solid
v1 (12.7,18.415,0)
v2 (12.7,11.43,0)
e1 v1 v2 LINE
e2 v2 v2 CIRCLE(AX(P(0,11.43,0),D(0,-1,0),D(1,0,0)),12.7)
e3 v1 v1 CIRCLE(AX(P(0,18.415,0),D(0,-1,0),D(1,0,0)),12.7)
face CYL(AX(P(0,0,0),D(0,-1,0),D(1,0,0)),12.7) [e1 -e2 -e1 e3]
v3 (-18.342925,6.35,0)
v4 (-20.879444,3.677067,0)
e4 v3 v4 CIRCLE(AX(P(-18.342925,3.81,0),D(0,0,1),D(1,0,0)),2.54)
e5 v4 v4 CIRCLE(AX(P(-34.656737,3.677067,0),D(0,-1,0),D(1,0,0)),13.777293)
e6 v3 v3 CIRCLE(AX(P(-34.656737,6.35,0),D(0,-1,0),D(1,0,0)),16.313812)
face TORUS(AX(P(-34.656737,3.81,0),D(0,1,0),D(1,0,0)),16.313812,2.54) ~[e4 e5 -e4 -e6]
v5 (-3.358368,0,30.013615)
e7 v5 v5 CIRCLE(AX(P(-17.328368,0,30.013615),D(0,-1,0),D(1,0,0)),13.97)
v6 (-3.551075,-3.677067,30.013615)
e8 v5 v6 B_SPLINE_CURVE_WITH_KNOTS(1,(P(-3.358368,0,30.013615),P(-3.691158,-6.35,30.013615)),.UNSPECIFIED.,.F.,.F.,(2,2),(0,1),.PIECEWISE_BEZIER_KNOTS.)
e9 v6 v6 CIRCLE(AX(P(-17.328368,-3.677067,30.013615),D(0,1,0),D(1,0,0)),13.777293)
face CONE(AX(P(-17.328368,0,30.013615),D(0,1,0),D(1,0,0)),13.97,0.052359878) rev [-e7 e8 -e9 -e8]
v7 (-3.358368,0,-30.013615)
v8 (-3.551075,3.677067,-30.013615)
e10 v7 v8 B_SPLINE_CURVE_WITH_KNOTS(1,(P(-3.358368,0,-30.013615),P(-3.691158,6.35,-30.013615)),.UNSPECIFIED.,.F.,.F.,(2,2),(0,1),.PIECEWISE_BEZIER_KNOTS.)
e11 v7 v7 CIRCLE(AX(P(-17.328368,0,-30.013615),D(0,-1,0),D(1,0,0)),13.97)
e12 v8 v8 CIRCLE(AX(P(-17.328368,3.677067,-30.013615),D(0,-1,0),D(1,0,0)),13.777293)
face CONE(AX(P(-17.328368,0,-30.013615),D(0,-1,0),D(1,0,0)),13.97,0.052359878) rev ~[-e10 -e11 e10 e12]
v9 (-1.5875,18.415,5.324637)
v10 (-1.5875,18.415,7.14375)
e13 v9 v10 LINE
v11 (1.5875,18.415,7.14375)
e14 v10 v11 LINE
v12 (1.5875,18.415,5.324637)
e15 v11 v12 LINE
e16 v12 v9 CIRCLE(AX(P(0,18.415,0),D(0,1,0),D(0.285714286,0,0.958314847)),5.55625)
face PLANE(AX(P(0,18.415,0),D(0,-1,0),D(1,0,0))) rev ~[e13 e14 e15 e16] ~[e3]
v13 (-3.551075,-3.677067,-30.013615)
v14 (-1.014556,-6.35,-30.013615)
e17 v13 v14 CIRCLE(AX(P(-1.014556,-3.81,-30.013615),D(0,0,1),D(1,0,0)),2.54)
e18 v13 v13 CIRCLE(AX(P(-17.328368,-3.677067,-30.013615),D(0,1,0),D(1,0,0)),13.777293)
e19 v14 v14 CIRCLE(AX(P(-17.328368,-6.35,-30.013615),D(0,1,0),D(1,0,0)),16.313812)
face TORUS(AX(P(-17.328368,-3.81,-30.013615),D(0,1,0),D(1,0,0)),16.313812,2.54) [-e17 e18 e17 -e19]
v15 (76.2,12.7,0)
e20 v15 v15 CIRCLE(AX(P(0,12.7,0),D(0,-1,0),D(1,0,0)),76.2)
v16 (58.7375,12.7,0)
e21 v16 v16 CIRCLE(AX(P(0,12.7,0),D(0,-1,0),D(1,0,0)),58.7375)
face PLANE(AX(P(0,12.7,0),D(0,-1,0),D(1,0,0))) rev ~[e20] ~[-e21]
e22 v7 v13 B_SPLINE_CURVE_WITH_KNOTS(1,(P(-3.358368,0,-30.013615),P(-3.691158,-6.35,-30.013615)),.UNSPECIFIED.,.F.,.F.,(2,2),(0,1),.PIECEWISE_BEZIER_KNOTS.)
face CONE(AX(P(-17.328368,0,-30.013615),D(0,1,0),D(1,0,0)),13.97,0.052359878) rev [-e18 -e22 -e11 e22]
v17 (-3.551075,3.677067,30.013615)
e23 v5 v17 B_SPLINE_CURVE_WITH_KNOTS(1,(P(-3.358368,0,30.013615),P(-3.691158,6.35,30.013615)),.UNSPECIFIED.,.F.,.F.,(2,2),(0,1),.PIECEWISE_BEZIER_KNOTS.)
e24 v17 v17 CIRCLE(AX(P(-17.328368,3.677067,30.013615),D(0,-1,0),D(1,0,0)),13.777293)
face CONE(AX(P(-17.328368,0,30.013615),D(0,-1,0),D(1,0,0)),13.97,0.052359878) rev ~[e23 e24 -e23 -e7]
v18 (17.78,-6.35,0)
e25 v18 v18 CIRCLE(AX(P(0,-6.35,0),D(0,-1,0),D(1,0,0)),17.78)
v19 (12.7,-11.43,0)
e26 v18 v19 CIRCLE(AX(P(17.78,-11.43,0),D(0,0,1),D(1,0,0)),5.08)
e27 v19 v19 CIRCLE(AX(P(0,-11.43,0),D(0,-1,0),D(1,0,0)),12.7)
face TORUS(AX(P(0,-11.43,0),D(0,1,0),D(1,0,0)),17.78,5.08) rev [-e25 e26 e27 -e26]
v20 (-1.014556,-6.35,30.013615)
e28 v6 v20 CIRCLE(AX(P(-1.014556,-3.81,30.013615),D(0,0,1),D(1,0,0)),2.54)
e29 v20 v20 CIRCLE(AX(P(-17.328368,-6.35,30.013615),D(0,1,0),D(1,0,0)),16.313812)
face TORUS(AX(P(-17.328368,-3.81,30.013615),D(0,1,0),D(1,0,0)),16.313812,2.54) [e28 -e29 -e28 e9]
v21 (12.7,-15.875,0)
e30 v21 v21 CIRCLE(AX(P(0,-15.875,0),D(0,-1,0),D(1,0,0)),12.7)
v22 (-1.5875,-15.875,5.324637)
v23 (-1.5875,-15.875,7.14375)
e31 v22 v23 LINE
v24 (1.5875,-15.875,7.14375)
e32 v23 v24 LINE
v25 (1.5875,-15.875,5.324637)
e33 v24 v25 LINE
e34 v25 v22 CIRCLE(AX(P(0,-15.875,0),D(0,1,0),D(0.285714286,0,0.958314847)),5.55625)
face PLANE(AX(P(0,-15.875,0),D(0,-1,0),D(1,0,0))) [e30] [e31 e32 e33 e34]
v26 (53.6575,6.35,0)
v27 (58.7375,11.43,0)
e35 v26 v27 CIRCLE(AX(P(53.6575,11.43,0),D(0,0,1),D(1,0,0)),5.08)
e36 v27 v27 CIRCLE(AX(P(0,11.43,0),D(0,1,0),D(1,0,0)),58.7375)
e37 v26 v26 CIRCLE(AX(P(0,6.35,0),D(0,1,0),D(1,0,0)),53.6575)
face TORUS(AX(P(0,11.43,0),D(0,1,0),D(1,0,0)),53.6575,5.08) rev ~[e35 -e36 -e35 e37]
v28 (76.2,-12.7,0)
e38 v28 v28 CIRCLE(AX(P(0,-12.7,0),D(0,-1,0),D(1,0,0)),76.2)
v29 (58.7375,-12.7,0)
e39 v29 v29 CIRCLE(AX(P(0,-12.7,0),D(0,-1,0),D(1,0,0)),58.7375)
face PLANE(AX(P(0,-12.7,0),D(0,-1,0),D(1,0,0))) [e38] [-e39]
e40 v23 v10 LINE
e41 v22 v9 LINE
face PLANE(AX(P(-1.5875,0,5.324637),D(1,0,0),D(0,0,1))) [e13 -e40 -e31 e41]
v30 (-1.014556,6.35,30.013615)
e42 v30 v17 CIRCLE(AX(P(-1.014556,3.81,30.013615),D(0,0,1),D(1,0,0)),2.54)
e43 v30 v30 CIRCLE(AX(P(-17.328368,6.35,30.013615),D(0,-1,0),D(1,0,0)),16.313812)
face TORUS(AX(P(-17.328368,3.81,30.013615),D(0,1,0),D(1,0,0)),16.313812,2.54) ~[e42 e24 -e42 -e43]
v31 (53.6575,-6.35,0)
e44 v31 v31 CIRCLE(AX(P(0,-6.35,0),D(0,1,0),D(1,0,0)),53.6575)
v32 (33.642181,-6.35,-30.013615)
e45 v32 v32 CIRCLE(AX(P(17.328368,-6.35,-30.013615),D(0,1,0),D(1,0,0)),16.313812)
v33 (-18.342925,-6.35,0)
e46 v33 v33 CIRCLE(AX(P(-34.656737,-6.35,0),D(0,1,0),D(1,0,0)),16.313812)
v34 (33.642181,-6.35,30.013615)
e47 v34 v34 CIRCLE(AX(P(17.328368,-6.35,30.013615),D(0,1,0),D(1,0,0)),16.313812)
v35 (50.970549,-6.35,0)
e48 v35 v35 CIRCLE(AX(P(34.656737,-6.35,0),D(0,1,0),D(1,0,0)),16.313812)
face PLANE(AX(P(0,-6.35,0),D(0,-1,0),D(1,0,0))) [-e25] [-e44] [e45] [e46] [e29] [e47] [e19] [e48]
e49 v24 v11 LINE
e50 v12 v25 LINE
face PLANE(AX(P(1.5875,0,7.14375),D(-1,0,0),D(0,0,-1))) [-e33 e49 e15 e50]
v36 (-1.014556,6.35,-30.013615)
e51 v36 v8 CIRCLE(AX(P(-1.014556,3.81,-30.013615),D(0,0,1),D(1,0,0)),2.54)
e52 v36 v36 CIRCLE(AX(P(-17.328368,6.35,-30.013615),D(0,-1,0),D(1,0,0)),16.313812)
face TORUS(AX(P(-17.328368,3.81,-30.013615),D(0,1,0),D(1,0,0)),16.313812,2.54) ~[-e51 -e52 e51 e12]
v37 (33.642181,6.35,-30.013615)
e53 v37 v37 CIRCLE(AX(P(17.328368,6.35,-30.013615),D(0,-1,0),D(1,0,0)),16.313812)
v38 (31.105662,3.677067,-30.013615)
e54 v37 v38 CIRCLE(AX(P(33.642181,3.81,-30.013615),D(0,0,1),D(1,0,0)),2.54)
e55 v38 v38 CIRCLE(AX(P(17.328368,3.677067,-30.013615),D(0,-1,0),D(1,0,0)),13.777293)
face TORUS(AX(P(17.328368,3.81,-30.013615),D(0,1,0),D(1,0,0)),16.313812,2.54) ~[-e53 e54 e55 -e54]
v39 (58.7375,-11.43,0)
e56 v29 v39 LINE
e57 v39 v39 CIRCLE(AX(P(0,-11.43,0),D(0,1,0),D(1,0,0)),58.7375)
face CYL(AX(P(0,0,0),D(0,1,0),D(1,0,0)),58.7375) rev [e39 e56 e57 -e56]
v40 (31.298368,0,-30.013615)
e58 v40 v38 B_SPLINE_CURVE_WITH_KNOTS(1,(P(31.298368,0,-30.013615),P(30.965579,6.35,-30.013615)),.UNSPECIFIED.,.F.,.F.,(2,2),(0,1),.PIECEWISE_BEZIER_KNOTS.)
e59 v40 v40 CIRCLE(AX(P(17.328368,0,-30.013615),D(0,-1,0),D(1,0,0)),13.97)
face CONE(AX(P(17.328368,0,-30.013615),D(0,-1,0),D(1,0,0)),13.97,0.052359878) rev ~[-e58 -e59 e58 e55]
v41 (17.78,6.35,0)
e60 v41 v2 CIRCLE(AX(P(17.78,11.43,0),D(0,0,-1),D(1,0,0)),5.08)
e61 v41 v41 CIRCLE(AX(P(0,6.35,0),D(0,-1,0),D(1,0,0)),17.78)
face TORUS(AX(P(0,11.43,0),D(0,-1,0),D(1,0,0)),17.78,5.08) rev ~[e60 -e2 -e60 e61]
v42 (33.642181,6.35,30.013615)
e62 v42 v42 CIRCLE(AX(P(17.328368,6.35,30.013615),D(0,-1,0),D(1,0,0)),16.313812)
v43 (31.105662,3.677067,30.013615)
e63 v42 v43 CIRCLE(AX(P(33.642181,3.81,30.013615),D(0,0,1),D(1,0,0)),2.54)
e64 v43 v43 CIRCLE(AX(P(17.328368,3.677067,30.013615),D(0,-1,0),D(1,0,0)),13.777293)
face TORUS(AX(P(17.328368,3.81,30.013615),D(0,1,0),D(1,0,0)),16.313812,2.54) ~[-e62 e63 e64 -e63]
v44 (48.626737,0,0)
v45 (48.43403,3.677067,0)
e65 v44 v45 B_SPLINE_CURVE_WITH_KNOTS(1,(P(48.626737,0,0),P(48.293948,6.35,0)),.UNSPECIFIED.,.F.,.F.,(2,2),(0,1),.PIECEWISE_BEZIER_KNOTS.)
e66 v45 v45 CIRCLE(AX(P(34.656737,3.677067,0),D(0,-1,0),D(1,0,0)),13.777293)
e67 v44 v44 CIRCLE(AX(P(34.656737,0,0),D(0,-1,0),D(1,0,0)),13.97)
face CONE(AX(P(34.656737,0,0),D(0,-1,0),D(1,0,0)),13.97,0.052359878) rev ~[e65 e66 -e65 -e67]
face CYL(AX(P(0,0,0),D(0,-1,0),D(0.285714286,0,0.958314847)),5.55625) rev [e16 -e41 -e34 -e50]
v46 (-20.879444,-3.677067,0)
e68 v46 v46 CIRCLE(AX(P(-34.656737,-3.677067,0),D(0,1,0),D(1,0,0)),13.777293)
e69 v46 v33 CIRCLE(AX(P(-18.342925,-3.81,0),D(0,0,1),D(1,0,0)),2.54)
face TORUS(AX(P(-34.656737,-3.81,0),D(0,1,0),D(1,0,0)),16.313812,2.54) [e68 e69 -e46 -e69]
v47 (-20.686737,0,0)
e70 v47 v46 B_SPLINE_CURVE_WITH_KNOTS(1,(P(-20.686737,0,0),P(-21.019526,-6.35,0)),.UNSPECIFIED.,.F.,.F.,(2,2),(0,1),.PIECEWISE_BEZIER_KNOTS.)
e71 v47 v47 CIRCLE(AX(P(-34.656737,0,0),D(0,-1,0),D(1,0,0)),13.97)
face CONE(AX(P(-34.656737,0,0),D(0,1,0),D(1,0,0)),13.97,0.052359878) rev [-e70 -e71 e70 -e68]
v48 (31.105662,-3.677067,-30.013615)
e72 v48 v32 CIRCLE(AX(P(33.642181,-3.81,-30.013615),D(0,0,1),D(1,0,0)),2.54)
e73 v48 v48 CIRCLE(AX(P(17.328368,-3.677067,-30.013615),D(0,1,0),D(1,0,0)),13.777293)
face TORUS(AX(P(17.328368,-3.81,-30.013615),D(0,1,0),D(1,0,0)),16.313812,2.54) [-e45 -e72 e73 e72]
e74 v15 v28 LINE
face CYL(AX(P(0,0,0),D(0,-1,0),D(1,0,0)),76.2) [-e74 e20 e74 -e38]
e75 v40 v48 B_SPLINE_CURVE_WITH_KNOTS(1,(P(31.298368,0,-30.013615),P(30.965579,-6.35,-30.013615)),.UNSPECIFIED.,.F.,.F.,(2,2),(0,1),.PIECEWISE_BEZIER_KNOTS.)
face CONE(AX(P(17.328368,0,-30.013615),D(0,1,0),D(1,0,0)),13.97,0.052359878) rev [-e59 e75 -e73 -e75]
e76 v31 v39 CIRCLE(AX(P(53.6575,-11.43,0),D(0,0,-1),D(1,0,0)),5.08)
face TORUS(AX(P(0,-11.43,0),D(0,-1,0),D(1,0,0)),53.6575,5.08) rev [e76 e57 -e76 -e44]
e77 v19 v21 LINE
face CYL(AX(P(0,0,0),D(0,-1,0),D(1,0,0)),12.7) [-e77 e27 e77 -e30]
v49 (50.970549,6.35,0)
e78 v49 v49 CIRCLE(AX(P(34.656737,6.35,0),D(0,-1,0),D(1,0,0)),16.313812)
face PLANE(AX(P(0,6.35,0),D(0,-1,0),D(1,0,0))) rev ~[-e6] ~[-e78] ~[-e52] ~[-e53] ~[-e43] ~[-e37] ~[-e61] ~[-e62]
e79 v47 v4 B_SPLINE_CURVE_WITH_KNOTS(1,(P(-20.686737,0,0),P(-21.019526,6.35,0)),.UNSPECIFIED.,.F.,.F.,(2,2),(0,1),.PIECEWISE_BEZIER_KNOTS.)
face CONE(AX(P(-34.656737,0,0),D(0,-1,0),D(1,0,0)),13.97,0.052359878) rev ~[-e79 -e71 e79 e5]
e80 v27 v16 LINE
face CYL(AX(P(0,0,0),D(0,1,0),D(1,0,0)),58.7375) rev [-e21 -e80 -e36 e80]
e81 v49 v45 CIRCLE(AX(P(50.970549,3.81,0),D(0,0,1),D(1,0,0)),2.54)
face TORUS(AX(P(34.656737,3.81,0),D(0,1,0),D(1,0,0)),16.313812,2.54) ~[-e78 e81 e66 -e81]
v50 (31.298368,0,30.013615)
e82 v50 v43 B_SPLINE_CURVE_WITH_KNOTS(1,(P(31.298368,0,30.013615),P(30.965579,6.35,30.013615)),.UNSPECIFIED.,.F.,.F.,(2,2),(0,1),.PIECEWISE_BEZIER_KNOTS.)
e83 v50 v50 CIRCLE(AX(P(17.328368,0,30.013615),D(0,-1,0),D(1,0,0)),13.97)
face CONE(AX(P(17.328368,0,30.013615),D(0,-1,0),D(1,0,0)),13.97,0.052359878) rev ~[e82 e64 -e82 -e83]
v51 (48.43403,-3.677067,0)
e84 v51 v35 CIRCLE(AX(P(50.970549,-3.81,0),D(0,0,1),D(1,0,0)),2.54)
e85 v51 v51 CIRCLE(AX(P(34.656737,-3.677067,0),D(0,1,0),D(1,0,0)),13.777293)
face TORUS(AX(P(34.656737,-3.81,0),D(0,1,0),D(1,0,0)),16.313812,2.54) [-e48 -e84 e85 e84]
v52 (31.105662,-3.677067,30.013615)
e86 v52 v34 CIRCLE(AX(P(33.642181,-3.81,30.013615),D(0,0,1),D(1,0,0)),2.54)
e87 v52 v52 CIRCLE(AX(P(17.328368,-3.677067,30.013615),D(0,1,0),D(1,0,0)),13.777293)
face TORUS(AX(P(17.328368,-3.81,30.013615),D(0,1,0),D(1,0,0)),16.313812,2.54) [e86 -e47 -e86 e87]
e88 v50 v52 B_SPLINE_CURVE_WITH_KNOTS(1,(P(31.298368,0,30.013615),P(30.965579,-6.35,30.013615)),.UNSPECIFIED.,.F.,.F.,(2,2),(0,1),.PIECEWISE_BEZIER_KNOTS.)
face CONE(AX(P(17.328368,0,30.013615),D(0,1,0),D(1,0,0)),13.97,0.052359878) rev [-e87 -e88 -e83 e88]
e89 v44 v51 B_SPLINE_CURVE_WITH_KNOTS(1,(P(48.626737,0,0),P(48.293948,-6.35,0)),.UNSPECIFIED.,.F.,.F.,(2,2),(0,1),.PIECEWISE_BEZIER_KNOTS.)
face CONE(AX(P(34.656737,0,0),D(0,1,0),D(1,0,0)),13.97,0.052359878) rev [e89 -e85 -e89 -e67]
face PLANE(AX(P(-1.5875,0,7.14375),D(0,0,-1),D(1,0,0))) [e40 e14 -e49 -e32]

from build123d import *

# Parameters (mm, degrees)
F0_R          = 76.2
F0_R_2        = 58.7375
F1_DEPTH      = 12.7
F1_DEPTH_BACK = 12.7
F0_R_3        = 12.7
F2_DEPTH      = 15.875
F2_DEPTH_BACK = 18.415
F3_R          = 62.6663384898
F3_R_2        = 13.97
F3_R_3        = 9.4882721097
F4_DEPTH      = 6.35
F4_TAPER      = -3
F4_DEPTH_BACK = 6.35
F4_TAPER_BACK = -3
F6_R          = 5.08
F7_R          = 2.54


with BuildPart() as f1:
    # F0 (on Front) → F1 (new body, two sides)
    with BuildSketch(Plane.XZ) as f1_sk:
        Circle(F0_R)
        Circle(F0_R_2, mode=Mode.SUBTRACT)
    extrude(amount=F1_DEPTH)
    extrude(f1_sk.sketch, amount=-F1_DEPTH_BACK)



with BuildPart() as f2:
    # F0 (on Front) → F2 (new body, two sides)
    with BuildSketch(Plane.XZ) as f2_sk:
        Circle(F0_R_3)
        with BuildLine():
            ThreePointArc((1.5875, 5.3246368714), (0, -5.55625), (-1.5875, 5.3246368714))
            Line((-1.5875, 5.3246368714), (-1.5875, 7.14375))
            Line((-1.5875, 7.14375), (1.5875, 7.14375))
            Line((1.5875, 7.14375), (1.5875, 5.3246368714))
        make_face(mode=Mode.SUBTRACT)
    extrude(amount=F2_DEPTH)
    extrude(f2_sk.sketch, amount=-F2_DEPTH_BACK)


with BuildPart() as f1_1:
    add(f1.part)

    add(f2.part)  # F4 merges F2
    # F3 (on face) → F4 (join, two sides)
    with BuildSketch(Plane.XZ) as f4_sk:
        Circle(F3_R)
        with Locations((-17.3283684999, -30.0136146541)):
            Circle(F3_R_2, mode=Mode.SUBTRACT)
        with Locations((17.3283684999, -30.0136146541)):
            Circle(F3_R_2, mode=Mode.SUBTRACT)
        with Locations((-34.6567369998, 0)):
            Circle(F3_R_2, mode=Mode.SUBTRACT)
        with Locations((-17.3283684999, 30.0136146541)):
            Circle(F3_R_2, mode=Mode.SUBTRACT)
        Circle(F3_R_3, mode=Mode.SUBTRACT)
        with Locations((17.3283684999, 30.0136146541)):
            Circle(F3_R_2, mode=Mode.SUBTRACT)
        with Locations((34.6567369998, 0)):
            Circle(F3_R_2, mode=Mode.SUBTRACT)
    extrude(amount=F4_DEPTH, taper=F4_TAPER)
    extrude(f4_sk.sketch, amount=-F4_DEPTH_BACK, taper=F4_TAPER_BACK)

    # F5: union 

    # F6
    f6_edges = [f1_1.edges().sort_by_distance(p)[0] for p in [
        (-58.7375, 6.35, 0),
        (-12.7, 6.35, 0),
        (-12.7, -6.35, 0),
        (-58.7375, -6.35, 0),
    ]]
    fillet(f6_edges, radius=F6_R)

    # F7
    f7_edges = [f1_1.edges().sort_by_distance(p)[0] for p in [
        (-30.965579, -6.35, -30.013615),
        (3.691158, -6.35, -30.013615),
        (-48.293948, -6.35, 0),
        (-30.965579, -6.35, 30.013615),
        (21.019526, -6.35, 0),
        (3.691158, -6.35, 30.013615),
        (-30.965579, 6.35, -30.013615),
        (3.691158, 6.35, -30.013615),
        (-48.293948, 6.35, 0),
        (-30.965579, 6.35, 30.013615),
        (21.019526, 6.35, 0),
        (3.691158, 6.35, 30.013615),
    ]]
    fillet(f7_edges, radius=F7_R)


solid = f1_1.part
